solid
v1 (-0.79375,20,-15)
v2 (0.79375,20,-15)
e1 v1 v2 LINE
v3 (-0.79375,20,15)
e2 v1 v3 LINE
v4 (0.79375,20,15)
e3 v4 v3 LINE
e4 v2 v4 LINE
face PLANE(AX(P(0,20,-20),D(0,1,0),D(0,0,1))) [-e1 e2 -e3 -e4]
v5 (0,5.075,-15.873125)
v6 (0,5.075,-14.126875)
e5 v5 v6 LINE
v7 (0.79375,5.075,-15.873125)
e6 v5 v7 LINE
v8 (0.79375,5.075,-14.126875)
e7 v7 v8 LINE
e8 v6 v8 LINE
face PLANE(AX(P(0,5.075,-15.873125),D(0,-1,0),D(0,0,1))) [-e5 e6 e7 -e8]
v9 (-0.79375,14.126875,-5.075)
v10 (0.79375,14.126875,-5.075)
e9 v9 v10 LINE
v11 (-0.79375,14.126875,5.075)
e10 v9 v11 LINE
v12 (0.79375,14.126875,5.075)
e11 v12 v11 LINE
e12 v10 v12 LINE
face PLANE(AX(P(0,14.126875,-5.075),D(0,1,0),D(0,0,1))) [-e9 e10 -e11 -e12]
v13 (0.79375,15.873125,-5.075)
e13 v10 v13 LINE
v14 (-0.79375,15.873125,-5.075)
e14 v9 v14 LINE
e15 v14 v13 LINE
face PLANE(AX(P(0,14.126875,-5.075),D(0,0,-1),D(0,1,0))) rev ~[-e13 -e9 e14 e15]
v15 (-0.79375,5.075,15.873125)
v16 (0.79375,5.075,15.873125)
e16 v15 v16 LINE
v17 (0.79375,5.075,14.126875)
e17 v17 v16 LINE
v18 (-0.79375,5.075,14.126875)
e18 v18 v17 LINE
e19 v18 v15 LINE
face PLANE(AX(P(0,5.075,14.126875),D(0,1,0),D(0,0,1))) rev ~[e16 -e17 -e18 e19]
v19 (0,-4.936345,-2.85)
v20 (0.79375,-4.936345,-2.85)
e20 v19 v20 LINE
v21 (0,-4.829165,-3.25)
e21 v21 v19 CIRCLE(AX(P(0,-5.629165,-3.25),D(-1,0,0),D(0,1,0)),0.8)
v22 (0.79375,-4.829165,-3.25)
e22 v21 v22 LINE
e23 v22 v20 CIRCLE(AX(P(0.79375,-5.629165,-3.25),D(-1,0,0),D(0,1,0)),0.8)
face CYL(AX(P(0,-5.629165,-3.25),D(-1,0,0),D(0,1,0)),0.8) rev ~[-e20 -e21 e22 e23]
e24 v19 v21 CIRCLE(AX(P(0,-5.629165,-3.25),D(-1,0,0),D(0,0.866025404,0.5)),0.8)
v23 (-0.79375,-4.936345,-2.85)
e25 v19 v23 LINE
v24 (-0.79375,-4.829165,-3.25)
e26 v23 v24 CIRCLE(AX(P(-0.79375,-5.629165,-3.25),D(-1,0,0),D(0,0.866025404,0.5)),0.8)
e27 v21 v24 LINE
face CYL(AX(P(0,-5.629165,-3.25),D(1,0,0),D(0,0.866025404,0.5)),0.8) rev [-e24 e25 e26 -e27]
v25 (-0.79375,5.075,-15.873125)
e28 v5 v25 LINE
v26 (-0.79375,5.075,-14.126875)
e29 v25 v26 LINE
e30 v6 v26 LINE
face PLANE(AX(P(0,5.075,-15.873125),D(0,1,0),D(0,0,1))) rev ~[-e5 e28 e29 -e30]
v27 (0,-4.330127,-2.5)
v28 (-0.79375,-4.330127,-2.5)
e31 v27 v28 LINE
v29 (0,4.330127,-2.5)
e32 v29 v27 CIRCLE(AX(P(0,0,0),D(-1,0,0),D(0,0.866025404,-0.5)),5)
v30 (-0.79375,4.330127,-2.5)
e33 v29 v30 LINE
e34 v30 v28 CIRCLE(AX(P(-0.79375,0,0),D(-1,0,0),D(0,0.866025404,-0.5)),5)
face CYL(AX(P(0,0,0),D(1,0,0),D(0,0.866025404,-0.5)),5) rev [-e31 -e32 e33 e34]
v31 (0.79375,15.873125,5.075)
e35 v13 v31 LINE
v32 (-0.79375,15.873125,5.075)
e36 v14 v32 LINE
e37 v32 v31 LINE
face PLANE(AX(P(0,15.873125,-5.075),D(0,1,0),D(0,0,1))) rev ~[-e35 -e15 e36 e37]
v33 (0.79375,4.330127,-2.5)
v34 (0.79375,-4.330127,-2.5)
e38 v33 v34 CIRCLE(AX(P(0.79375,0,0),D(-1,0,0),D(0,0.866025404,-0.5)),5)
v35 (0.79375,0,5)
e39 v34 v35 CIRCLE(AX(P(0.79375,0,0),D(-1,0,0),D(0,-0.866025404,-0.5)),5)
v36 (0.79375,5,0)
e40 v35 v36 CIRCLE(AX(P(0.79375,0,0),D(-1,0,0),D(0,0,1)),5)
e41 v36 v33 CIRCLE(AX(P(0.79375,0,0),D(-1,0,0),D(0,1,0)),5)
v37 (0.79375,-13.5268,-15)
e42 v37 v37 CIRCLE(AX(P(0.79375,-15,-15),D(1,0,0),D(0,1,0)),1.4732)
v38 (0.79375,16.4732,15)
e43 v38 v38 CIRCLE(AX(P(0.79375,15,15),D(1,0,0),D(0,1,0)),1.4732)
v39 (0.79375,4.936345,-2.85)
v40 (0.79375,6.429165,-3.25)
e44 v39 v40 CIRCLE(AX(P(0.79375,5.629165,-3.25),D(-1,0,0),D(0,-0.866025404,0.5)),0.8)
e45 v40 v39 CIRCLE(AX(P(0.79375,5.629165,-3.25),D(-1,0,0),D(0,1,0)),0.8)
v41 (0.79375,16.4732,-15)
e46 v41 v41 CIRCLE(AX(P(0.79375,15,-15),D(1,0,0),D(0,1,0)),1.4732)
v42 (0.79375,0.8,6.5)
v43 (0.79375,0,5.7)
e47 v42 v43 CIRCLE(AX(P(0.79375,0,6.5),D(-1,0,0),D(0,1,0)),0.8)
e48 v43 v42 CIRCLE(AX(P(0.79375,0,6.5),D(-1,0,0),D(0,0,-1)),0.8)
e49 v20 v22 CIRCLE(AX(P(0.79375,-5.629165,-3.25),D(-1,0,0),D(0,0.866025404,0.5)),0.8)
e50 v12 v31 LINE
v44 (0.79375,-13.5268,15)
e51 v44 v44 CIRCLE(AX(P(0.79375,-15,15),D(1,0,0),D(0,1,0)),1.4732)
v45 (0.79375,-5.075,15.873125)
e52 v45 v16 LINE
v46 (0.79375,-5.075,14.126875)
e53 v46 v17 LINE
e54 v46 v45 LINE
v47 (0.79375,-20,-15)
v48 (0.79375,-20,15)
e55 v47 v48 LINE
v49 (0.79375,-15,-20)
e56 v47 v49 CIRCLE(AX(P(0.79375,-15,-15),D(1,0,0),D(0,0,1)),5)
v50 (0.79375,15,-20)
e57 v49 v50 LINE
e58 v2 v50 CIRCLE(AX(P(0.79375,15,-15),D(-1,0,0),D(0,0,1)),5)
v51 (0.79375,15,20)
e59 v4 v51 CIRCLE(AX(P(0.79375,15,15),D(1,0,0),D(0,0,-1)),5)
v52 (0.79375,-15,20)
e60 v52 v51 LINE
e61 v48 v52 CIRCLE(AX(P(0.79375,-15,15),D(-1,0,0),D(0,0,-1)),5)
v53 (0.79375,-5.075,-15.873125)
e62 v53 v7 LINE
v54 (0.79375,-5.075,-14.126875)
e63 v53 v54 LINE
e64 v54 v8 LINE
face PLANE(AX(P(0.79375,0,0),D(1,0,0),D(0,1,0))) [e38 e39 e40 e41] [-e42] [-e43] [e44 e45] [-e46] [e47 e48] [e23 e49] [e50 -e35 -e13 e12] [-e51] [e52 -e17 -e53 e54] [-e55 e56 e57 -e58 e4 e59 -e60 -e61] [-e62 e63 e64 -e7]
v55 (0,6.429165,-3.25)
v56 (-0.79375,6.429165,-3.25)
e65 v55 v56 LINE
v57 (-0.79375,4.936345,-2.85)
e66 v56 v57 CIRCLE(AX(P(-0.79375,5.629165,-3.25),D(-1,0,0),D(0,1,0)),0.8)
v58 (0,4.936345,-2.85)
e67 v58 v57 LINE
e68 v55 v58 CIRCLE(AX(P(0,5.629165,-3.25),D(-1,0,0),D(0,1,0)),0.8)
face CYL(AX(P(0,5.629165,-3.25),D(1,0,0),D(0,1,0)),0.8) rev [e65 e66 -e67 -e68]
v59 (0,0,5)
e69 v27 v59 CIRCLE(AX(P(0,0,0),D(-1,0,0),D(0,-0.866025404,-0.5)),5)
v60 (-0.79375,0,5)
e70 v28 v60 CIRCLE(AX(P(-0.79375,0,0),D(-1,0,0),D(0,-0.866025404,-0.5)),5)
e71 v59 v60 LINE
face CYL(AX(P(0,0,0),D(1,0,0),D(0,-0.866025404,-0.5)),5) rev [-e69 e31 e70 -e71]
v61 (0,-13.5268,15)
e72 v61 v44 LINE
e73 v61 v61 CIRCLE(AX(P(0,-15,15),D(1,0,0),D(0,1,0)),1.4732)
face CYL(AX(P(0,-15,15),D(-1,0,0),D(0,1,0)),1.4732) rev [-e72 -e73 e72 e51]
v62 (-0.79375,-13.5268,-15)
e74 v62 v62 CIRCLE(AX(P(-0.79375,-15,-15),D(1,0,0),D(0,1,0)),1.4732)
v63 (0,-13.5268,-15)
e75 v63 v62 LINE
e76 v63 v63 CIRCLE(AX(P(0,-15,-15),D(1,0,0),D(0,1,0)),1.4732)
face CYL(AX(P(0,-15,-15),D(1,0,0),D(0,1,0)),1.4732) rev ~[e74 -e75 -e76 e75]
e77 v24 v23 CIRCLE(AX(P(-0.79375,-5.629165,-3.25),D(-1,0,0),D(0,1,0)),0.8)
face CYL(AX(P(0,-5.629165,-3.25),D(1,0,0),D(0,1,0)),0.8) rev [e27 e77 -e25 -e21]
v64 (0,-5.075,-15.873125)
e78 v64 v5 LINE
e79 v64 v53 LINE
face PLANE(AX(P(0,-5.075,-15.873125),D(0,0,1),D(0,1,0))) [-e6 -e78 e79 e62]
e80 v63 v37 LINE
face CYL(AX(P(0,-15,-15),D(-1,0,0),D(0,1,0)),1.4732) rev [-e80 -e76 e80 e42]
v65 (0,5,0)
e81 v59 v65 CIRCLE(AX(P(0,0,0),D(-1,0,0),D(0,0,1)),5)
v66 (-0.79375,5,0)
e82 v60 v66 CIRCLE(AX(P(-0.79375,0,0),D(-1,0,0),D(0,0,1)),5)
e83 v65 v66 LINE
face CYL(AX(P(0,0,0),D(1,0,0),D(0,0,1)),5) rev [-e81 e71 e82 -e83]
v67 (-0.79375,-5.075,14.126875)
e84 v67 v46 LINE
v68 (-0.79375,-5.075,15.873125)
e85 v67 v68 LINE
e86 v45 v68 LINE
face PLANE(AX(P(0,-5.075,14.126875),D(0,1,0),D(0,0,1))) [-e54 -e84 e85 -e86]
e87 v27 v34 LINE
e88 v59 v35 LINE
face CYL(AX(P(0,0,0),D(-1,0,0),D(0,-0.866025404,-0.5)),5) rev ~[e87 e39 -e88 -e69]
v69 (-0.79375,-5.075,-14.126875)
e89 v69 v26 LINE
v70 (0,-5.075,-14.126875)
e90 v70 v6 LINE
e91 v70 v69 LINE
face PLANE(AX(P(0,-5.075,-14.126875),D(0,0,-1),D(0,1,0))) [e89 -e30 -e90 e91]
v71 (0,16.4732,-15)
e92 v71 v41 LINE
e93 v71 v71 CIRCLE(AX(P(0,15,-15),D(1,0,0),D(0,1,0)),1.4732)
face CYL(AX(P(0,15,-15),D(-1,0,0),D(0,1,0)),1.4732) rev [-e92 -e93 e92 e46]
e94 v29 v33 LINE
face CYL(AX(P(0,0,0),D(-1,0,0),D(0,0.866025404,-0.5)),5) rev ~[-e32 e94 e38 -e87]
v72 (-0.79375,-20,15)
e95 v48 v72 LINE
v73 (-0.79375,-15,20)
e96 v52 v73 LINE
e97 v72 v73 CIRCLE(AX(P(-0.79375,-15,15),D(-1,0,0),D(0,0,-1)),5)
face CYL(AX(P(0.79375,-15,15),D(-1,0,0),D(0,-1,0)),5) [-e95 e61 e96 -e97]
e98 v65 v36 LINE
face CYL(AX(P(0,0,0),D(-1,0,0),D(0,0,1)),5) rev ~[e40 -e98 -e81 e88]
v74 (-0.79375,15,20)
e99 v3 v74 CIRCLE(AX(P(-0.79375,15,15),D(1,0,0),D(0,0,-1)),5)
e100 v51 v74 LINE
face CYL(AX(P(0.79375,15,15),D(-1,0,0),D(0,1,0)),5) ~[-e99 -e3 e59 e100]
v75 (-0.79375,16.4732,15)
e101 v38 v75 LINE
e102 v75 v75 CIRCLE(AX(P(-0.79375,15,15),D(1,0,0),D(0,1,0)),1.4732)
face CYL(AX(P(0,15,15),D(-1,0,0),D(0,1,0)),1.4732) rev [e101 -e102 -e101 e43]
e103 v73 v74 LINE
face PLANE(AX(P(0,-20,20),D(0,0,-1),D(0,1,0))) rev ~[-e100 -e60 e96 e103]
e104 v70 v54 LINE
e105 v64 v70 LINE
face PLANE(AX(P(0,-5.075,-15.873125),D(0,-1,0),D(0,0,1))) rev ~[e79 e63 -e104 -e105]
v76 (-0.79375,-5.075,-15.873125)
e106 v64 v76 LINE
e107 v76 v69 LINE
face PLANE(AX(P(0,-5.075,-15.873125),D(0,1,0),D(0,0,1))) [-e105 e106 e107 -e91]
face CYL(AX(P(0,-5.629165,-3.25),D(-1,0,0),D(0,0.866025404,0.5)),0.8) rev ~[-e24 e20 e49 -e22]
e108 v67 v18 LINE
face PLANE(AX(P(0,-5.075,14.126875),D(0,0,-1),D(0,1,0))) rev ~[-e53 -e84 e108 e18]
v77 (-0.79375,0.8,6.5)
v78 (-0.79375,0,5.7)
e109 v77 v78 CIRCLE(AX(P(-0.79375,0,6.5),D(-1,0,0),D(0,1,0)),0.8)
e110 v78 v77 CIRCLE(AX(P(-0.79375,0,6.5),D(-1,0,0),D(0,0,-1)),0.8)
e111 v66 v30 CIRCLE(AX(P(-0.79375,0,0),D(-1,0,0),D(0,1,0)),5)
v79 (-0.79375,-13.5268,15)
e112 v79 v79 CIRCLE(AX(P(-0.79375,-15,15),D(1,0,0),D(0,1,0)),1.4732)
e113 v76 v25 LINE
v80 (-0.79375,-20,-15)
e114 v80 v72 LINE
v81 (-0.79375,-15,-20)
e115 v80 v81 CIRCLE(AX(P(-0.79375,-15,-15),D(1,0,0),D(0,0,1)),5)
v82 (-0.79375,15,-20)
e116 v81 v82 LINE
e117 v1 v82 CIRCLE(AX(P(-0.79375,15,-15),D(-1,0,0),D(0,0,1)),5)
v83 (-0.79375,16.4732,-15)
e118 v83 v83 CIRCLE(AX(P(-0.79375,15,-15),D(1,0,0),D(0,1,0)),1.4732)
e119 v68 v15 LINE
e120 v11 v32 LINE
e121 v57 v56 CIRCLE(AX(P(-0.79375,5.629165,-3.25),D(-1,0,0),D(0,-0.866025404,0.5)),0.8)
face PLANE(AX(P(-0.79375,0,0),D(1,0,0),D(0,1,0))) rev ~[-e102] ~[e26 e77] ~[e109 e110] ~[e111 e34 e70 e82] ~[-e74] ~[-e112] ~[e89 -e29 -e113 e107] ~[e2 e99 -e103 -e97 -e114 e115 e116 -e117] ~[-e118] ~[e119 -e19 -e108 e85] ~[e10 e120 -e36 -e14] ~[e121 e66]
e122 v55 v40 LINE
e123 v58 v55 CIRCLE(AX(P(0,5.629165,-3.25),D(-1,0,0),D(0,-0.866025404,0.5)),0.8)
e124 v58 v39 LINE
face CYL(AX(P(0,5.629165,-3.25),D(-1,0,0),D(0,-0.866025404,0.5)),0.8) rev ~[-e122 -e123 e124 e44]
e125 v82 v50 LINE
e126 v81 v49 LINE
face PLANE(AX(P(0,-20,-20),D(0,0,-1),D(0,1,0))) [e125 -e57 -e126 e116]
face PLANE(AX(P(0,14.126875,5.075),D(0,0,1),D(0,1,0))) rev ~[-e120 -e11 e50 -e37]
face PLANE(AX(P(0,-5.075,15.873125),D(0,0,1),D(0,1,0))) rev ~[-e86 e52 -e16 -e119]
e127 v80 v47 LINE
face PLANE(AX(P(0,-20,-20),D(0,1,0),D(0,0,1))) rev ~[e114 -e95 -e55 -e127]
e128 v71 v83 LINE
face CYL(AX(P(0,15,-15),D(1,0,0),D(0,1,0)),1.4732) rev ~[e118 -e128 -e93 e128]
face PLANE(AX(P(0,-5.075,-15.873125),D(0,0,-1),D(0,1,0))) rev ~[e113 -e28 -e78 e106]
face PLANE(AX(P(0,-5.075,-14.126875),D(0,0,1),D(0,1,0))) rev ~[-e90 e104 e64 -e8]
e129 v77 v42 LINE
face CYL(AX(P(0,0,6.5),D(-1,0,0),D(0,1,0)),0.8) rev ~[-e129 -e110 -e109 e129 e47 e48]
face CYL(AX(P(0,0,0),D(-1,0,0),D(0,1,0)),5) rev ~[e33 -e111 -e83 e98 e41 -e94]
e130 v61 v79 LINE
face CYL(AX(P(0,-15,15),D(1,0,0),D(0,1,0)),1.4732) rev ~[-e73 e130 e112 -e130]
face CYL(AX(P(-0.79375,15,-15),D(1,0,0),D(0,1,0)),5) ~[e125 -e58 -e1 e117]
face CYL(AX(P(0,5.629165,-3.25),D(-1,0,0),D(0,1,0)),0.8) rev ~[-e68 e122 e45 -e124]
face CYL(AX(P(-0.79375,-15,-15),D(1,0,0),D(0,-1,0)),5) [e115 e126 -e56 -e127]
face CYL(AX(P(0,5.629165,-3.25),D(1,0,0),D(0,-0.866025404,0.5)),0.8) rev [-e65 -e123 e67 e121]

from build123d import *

# Parameters (mm, degrees)
F0_W     = 40
F0_H     = 40
F0_R     = 1.4732
F0_W_2   = 10.15
F0_H_2   = 1.74625
F0_W_3   = 1.74625
F0_H_3   = 10.15
F1_DEPTH = 0.79375
F2_R     = 5


# Not quite as in the source:
# - a length typed as a fraction of an inch, garbled in the dataset ("3 / 203.2 mm" for 3/8 in), is restored


with BuildPart() as f1:
    # F0 (on Right) → F1 (new body, symmetric)
    with BuildSketch(Plane.YZ):
        Rectangle(F0_W, F0_H)
        with Locations((-15, -15)):
            Circle(F0_R, mode=Mode.SUBTRACT)
        with BuildLine():
            ThreePointArc((-4.8291651246, -3.25), (-6.4019057856, -3.4570552361), (-4.9363448016, -2.85))
            ThreePointArc((-4.9363448016, -2.85), (-4.8564244636, -3.0429447639), (-4.8291651246, -3.25))
        make_face(mode=Mode.SUBTRACT)
        with Locations((0, -15)):
            Rectangle(F0_W_2, F0_H_2, mode=Mode.SUBTRACT)
        with Locations((15, -15)):
            Circle(F0_R, mode=Mode.SUBTRACT)
        with BuildLine():
            ThreePointArc((6.4291651246, -3.25), (5.4221098885, -4.022740661), (4.9363448016, -2.85))
            ThreePointArc((4.9363448016, -2.85), (5.8362203607, -2.477259339), (6.4291651246, -3.25))
        make_face(mode=Mode.SUBTRACT)
        with Locations((-15, 15)):
            Circle(F0_R, mode=Mode.SUBTRACT)
        with BuildLine():
            ThreePointArc((0, 5), (3.5355339059, 3.5355339059), (5, 0))
            ThreePointArc((5, 0), (4.8296291314, -1.2940952255), (4.3301270189, -2.5))
            ThreePointArc((4.3301270189, -2.5), (0, -5), (-4.3301270189, -2.5))
            ThreePointArc((-4.3301270189, -2.5), (-4.3301270189, 2.5), (0, 5))
        make_face(mode=Mode.SUBTRACT)
        with BuildLine():
            ThreePointArc((0.8, 6.5), (0.5656854249, 5.9343145751), (0, 5.7))
            ThreePointArc((0, 5.7), (-0.5656854249, 7.0656854249), (0.8, 6.5))
        make_face(mode=Mode.SUBTRACT)
        with Locations((15, 0)):
            Rectangle(F0_W_3, F0_H_3, mode=Mode.SUBTRACT)
        with Locations((0, 15)):
            Rectangle(F0_W_2, F0_H_2, mode=Mode.SUBTRACT)
        with Locations((15, 15)):
            Circle(F0_R, mode=Mode.SUBTRACT)
    extrude(amount=F1_DEPTH, both=True)

    # F2
    f2_edges = [f1.edges().sort_by_distance(p)[0] for p in [
        (0, -20, 20),
        (0, 20, 20),
        (0, -20, -20),
        (0, 20, -20),
    ]]
    fillet(f2_edges, radius=F2_R)


solid = f1.part
